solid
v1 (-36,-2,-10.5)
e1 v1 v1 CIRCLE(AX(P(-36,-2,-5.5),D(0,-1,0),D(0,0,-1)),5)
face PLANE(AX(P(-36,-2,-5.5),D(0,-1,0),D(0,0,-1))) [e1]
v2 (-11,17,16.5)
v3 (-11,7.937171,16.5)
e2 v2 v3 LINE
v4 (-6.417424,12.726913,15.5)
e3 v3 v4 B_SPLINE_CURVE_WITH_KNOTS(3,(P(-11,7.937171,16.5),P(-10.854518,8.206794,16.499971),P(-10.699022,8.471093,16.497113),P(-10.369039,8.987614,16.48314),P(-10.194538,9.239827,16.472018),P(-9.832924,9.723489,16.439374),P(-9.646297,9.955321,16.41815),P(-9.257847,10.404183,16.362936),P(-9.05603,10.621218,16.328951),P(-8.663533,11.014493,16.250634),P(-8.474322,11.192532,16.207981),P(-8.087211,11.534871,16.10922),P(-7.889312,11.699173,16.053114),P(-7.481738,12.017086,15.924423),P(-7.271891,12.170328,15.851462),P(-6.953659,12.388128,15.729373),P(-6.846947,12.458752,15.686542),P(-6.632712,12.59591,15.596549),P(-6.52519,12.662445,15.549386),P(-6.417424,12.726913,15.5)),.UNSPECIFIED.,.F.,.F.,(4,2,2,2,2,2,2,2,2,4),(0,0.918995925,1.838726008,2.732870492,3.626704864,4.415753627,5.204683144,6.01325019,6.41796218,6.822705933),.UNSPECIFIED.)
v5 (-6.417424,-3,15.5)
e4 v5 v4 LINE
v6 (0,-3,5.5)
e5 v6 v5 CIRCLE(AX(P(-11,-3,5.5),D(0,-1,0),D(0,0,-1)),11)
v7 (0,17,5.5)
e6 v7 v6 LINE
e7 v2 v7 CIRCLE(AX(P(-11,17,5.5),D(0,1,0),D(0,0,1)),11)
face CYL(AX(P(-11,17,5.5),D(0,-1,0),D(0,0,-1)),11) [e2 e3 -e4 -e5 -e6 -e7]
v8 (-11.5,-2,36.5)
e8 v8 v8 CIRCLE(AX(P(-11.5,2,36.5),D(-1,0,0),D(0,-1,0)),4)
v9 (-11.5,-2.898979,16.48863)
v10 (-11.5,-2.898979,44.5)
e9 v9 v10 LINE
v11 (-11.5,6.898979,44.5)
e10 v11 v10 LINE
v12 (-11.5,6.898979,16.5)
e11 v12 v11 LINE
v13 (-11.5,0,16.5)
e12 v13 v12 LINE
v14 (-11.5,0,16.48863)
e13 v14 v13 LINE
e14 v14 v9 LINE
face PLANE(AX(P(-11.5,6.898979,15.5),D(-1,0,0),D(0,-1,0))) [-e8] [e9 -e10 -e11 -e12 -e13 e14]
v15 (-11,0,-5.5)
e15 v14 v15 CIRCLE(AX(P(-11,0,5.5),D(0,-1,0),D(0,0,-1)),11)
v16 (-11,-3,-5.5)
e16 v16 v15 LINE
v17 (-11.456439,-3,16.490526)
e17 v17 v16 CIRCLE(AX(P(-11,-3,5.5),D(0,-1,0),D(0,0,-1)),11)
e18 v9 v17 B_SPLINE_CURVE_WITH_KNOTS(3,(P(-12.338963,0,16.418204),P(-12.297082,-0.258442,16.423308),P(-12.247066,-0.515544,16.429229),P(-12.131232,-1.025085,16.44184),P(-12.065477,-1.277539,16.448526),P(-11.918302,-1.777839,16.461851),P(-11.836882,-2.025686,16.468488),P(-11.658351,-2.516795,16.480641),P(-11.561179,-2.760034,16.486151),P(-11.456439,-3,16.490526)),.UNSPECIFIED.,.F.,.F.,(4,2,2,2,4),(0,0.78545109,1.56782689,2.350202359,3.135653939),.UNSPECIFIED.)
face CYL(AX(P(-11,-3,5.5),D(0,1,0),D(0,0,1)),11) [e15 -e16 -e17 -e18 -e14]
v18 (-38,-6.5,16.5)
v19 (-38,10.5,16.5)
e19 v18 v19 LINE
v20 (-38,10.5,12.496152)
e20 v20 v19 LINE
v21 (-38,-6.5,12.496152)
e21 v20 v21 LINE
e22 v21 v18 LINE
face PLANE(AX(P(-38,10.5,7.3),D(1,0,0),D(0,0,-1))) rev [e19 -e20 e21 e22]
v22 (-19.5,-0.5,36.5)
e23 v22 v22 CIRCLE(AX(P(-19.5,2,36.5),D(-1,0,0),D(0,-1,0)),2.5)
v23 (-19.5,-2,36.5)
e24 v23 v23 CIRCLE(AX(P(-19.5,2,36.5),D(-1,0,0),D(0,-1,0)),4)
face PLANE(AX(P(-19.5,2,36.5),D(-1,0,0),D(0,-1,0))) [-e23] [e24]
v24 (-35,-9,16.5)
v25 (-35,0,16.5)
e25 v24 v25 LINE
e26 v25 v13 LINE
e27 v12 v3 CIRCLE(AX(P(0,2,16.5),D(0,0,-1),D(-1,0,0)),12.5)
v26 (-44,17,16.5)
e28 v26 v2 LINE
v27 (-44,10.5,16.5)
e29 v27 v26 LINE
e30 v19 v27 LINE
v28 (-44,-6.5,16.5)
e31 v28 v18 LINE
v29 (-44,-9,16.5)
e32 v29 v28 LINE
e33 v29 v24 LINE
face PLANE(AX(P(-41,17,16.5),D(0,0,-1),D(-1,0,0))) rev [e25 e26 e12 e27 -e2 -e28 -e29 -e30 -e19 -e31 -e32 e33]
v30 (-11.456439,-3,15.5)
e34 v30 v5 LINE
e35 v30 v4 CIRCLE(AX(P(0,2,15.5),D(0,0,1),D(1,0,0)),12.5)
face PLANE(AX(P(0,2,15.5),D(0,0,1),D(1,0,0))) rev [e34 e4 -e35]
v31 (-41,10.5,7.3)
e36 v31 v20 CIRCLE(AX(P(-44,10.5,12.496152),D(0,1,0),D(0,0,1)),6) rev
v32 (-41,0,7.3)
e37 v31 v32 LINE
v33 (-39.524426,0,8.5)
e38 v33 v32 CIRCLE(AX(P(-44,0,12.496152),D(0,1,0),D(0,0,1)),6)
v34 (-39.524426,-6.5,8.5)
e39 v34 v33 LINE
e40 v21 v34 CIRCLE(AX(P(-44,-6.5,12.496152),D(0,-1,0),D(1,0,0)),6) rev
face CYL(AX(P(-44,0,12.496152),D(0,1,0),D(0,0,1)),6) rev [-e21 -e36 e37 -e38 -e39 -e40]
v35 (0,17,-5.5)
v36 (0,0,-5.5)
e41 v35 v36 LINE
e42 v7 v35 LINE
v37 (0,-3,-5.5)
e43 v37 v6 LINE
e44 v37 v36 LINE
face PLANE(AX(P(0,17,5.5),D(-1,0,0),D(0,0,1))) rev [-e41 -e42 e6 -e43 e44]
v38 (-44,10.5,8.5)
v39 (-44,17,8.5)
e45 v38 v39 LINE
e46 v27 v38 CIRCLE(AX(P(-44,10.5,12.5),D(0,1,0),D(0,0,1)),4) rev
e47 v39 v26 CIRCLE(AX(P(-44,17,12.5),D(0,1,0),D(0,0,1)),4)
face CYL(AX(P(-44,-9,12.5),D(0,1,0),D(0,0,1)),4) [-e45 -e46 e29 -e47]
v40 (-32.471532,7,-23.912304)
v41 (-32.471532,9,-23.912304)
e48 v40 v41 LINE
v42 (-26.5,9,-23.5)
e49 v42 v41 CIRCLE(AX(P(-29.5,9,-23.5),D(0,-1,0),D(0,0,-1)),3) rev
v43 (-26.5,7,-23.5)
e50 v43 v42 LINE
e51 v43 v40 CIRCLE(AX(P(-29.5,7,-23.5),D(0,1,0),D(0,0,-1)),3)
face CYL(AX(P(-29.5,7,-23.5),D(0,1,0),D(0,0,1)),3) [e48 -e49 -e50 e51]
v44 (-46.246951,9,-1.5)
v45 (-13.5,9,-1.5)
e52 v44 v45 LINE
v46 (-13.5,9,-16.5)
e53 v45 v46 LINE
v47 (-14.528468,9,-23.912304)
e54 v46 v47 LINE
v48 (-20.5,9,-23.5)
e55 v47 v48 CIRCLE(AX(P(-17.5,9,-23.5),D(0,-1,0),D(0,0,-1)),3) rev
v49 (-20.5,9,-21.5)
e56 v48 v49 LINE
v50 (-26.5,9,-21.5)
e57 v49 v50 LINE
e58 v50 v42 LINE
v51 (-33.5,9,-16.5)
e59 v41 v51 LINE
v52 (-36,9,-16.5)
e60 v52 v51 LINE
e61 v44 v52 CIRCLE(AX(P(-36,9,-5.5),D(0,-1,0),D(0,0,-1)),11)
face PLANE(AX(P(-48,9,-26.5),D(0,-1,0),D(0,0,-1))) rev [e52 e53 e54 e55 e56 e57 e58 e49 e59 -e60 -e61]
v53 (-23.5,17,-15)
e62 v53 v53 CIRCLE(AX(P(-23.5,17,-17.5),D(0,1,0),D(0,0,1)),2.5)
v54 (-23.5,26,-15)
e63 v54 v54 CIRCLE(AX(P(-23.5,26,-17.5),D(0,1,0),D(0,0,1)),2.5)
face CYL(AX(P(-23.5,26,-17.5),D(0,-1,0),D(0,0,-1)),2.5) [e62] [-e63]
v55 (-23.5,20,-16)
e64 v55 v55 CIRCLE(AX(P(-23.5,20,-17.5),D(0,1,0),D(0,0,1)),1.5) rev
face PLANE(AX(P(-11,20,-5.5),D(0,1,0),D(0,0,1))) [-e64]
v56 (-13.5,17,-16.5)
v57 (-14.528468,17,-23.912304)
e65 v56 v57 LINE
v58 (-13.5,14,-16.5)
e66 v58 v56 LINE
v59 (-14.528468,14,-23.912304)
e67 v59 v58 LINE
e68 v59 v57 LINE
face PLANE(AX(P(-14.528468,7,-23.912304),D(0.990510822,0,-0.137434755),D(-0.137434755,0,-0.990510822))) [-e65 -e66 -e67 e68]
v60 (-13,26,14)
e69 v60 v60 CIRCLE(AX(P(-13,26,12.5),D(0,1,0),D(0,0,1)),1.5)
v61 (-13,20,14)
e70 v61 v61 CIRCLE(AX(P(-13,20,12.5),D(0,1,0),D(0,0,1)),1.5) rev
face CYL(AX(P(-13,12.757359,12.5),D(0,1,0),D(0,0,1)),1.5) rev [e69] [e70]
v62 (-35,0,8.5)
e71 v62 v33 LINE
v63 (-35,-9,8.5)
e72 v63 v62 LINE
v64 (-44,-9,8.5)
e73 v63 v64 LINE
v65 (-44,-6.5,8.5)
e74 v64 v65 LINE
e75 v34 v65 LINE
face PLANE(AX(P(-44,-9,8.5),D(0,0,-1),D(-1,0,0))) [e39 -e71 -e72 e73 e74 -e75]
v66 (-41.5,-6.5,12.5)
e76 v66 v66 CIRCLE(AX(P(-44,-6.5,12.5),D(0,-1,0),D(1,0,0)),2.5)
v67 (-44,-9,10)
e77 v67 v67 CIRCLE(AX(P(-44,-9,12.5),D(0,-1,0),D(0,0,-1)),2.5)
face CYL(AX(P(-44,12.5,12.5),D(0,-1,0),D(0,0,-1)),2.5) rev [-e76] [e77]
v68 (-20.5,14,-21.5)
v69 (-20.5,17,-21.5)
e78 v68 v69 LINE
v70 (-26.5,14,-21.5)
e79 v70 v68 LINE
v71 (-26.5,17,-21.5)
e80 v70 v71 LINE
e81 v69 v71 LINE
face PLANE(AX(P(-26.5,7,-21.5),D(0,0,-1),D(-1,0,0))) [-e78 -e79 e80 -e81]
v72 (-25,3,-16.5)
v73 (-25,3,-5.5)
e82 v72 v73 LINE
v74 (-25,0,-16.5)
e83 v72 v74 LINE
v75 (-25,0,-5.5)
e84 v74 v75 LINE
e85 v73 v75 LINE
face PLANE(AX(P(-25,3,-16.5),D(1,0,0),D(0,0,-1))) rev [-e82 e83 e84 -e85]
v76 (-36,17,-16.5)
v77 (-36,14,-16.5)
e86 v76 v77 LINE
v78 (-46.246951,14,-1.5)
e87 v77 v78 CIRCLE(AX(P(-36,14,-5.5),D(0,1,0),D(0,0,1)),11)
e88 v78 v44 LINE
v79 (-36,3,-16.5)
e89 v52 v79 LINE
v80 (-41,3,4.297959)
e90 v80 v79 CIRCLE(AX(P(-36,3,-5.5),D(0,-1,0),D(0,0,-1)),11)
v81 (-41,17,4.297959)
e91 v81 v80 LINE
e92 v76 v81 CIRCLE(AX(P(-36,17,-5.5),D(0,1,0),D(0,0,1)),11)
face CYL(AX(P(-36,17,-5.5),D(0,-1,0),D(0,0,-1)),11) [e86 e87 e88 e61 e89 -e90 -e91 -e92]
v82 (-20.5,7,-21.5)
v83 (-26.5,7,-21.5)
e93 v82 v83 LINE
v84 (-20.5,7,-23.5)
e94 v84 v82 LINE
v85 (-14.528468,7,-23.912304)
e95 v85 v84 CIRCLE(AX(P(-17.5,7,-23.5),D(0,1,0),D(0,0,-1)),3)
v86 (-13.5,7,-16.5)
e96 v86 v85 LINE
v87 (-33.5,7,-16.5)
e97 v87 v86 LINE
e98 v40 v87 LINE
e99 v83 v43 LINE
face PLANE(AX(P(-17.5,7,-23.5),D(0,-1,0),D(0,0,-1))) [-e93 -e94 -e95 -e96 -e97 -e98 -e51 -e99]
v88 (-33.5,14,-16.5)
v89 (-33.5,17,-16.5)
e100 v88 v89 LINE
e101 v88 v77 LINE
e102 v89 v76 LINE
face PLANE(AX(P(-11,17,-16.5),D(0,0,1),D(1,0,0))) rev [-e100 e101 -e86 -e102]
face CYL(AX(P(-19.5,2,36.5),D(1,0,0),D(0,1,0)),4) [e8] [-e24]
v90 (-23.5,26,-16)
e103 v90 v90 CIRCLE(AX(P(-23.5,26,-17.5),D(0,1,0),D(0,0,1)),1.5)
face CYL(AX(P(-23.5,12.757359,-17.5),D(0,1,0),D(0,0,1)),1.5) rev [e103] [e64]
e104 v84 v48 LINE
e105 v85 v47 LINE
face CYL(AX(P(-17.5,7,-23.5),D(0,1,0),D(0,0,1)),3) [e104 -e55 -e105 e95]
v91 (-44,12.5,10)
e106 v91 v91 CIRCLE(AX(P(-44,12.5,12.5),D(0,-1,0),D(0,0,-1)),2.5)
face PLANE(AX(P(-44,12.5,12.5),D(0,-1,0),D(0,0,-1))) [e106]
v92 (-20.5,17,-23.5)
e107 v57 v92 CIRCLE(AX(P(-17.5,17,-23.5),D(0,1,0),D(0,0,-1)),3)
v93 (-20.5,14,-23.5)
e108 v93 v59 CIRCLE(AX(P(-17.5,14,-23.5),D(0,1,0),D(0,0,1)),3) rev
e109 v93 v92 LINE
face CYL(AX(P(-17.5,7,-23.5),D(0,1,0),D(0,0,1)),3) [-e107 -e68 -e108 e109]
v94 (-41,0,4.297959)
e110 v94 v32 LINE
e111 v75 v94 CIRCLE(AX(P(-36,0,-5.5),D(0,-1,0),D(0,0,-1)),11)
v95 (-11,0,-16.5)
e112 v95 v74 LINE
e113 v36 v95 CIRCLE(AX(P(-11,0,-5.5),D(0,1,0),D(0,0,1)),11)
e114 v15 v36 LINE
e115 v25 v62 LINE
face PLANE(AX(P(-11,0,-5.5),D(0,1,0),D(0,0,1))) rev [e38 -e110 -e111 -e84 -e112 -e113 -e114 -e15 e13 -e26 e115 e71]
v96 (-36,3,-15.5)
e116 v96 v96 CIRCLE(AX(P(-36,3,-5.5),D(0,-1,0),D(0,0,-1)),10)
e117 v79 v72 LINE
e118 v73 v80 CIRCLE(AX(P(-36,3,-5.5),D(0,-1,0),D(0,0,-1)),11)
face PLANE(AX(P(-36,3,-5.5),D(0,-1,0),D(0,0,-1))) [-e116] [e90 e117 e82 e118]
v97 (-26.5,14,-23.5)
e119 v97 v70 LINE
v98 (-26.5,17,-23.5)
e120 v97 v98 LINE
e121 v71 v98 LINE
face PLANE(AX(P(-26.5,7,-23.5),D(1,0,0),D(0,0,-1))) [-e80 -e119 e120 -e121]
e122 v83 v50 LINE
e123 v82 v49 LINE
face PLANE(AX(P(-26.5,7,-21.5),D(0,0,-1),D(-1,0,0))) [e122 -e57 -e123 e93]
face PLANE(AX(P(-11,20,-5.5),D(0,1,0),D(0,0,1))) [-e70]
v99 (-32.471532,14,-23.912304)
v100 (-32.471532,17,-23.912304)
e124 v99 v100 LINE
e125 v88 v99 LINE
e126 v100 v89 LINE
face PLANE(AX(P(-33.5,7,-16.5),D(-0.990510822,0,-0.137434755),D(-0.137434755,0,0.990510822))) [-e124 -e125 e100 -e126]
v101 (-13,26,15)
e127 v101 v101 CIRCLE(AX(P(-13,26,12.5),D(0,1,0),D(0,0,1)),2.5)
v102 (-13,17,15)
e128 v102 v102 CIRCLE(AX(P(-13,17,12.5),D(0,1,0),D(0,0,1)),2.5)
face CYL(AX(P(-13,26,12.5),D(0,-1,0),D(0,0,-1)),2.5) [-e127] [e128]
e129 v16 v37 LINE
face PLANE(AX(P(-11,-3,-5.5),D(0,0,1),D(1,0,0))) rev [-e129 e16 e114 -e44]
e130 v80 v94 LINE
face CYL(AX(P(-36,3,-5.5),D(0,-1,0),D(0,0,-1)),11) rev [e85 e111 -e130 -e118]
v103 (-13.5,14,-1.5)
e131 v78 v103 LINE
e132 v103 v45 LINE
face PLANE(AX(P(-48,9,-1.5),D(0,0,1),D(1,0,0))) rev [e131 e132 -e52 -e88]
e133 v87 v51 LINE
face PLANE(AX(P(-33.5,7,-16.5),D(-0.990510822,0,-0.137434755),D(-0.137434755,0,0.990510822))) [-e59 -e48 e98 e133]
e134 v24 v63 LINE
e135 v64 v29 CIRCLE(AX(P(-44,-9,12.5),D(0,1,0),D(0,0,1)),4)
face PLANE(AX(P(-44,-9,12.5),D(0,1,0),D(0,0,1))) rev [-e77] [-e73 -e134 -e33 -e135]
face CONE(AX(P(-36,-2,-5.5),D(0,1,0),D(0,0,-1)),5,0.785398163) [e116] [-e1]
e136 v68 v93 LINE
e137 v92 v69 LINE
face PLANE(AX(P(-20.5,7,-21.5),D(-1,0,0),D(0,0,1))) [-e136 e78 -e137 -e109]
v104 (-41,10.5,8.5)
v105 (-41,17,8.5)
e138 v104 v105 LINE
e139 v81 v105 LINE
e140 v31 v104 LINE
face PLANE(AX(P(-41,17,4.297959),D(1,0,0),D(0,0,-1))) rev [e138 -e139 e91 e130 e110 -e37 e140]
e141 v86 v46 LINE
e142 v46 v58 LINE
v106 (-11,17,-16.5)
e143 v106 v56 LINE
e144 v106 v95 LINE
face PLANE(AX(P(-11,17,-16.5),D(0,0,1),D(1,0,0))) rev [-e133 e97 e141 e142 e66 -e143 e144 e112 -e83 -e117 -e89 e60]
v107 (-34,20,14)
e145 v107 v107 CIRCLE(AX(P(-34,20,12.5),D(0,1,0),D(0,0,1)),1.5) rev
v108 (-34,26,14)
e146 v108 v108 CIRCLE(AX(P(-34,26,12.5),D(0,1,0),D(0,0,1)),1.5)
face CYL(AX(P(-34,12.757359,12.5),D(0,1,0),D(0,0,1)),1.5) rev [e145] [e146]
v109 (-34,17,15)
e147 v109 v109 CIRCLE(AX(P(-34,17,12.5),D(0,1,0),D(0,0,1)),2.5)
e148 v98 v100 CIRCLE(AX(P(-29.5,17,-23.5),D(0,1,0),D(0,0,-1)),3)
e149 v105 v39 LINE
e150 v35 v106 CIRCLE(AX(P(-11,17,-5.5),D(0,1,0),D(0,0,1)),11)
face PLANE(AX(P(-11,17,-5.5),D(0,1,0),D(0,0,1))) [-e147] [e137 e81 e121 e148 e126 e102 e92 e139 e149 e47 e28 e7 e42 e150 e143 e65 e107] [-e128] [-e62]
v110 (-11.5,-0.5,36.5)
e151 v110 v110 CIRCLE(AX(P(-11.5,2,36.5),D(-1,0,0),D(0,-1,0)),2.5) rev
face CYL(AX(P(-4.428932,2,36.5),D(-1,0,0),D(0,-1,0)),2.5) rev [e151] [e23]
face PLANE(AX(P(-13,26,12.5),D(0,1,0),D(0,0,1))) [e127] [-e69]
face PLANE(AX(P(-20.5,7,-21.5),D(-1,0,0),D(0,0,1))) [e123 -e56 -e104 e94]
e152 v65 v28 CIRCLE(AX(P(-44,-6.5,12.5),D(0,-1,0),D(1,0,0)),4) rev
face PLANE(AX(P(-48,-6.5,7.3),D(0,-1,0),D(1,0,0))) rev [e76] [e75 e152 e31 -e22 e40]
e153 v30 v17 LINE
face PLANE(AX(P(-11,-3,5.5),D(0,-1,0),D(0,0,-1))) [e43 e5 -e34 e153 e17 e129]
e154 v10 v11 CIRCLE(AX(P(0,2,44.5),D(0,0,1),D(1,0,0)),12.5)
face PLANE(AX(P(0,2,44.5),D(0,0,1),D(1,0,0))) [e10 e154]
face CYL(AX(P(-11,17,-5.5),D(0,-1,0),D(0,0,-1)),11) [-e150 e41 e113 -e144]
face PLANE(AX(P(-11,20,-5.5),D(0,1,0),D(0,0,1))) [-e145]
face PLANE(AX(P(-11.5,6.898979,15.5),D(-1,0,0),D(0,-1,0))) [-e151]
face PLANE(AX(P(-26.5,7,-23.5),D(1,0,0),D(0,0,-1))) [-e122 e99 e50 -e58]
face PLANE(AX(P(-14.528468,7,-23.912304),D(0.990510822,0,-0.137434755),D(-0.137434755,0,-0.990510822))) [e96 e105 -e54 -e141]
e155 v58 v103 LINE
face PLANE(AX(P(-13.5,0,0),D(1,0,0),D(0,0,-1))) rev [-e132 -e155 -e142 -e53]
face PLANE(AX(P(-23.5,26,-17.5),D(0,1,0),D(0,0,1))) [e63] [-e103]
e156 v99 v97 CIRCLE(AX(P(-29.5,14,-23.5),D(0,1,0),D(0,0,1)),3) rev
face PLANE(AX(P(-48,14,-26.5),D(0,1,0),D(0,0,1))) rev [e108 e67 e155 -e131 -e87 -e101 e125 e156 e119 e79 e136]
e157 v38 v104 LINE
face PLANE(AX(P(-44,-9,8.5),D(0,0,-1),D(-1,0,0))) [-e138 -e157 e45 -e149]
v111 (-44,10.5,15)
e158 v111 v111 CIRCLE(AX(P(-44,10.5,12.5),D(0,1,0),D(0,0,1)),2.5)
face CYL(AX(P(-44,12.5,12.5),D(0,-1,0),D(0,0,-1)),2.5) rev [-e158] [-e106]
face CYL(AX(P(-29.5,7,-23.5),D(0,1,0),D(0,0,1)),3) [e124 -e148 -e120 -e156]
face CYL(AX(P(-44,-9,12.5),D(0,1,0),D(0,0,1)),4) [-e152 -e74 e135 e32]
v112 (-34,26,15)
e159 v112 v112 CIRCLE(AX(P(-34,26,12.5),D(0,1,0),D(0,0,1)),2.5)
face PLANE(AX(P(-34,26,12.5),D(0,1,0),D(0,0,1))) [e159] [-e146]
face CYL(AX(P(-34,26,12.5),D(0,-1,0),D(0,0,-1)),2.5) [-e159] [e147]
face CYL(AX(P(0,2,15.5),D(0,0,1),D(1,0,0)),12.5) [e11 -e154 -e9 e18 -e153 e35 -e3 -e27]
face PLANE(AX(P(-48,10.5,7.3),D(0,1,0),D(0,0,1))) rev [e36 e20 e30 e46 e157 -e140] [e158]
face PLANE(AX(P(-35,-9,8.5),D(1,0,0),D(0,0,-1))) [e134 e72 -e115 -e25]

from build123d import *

# Parameters (mm, degrees)
BOSS_EXTRUDE1_DEPTH = 17
BOSS_EXTRUDE2_DEPTH = 10
BOSS_EXTRUDE3_DEPTH = 29
SKETCH6_R           = 4
BOSS_EXTRUDE4_DEPTH = 8
BOSS_EXTRUDE5_DEPTH = 26
SKETCH11_R          = 2.5
BOSS_EXTRUDE6_DEPTH = 9
BOSS_EXTRUDE8_START = 3
BOSS_EXTRUDE8_DEPTH = 3
CUT_EXTRUDE1_DEPTH  = 3
BOSS_EXTRUDE7_START = 2
SKETCH12_R          = 5
BOSS_EXTRUDE7_DEPTH = 5
BOSS_EXTRUDE7_TAPER = -45
SKETCH10_W          = 10
SKETCH10_H          = 17
CUT_EXTRUDE2_DEPTH  = 9.2
CUT_EXTRUDE3_START  = -13.5
SKETCH14_W          = 25
SKETCH14_H          = 5
CUT_EXTRUDE3_DEPTH  = 57.929042368
SKETCH15_R          = 2.5
CUT_EXTRUDE4_DEPTH  = 8
SKETCH16_R          = 1.5
CUT_EXTRUDE5_DEPTH  = 6
SKETCH17_R          = 2.5
CUT_EXTRUDE6_DEPTH  = 21.5
FILLET1_R           = 6


with BuildPart() as part:
    # Sketch1 → Boss-Extrude1 (new body)
    with BuildSketch(Plane(origin=(0, 0, 0), x_dir=(1, 0, 0), z_dir=(0, 1, 0))):
        with BuildLine():
            Line((-11, 16.5), (-36, 16.5))
            ThreePointArc((-36, 16.5), (-46.695268783, 8.071230378), (-41, -4.297958971))
            Line((-41, -4.297958971), (-41, -16.5))
            Line((-41, -16.5), (-11, -16.5))
            ThreePointArc((-11, -16.5), (-3.221825407, -13.278174593), (0, -5.5))
            Line((0, -5.5), (0, 5.5))
            ThreePointArc((0, 5.5), (-3.221825407, 13.278174593), (-11, 16.5))
        make_face()
    extrude(amount=BOSS_EXTRUDE1_DEPTH)

    # Sketch2 → Boss-Extrude2 (add)
    with BuildSketch(Plane(origin=(0, 17, 0), x_dir=(1, 0, 0), z_dir=(0, 1, 0))):
        with BuildLine():
            Line((-33.5, 16.5), (-32.471532465, 23.912304266))
            ThreePointArc((-32.471532465, 23.912304266), (-29.293357066, 26.492874655), (-26.5, 23.5))
            Line((-26.5, 23.5), (-26.5, 21.5))
            Line((-26.5, 21.5), (-20.5, 21.5))
            Line((-20.5, 21.5), (-20.5, 23.5))
            ThreePointArc((-20.5, 23.5), (-17.706642934, 26.492874655), (-14.528467535, 23.912304266))
            Line((-14.528467535, 23.912304266), (-13.5, 16.5))
            Line((-13.5, 16.5), (-33.5, 16.5))
        make_face()
    extrude(amount=-BOSS_EXTRUDE2_DEPTH)

    # Sketch5 → Boss-Extrude3 (add)
    with BuildSketch(Plane.XY.offset(44.5)):
        with BuildLine():
            Line((-11.5, 6.898979486), (-11.5, -2.898979486))
            ThreePointArc((-11.5, -2.898979486), (12.5, 2), (-11.5, 6.898979486))
        make_face()
    extrude(amount=-BOSS_EXTRUDE3_DEPTH)

    # Sketch6 → Boss-Extrude4 (add)
    with BuildSketch(Plane.ZY.offset(11.5)):
        with Locations(Location((36.5, 2, 0), (0, 0, 270))):
            Circle(SKETCH6_R)
    extrude(amount=BOSS_EXTRUDE4_DEPTH)

    # Sketch7 → Boss-Extrude5 (add)
    with BuildSketch(Plane(origin=(0, 17, 0), x_dir=(1, 0, 0), z_dir=(0, 1, 0))):
        with BuildLine():
            Line((-44, -8.5), (-35, -8.5))
            Line((-35, -8.5), (-35, -16.5))
            Line((-35, -16.5), (-44, -16.5))
            ThreePointArc((-44, -16.5), (-48, -12.5), (-44, -8.5))
        make_face()
    extrude(amount=-BOSS_EXTRUDE5_DEPTH)

    # Sketch11 → Boss-Extrude6 (add)
    with BuildSketch(Plane(origin=(0, 17, 0), x_dir=(1, 0, 0), z_dir=(0, 1, 0))):
        with Locations(Location((-23.5, 17.5, 0), (0, 0, 270))):
            Circle(SKETCH11_R)
        with Locations(Location((-34, -12.5, 0), (0, 0, 270))):
            Circle(SKETCH11_R)
        with Locations(Location((-13, -12.5, 0), (0, 0, 270))):
            Circle(SKETCH11_R)
    extrude(amount=BOSS_EXTRUDE6_DEPTH)

    # Sketch13 → Boss-Extrude8 (add)
    with BuildSketch(Plane.XZ.offset(BOSS_EXTRUDE8_START)):
        with BuildLine():
            Line((-11, -5.5), (0, -5.5))
            Line((0, -5.5), (0, 5.5))
            ThreePointArc((0, 5.5), (-18.778174593, 13.278174593), (-11, -5.5))
        make_face()
    extrude(amount=-BOSS_EXTRUDE8_DEPTH)

    # Sketch9 → Cut-Extrude1 (cut)
    with BuildSketch(Plane.XZ):
        with BuildLine():
            Line((-25, -16.5), (-25, -5.5))
            ThreePointArc((-25, -5.5), (-43.778174593, 2.278174593), (-36, -16.5))
            Line((-36, -16.5), (-25, -16.5))
        make_face()
    extrude(amount=-CUT_EXTRUDE1_DEPTH, mode=Mode.SUBTRACT)

    # Sketch12 → Boss-Extrude7 (add)
    with BuildSketch(Plane.XZ.offset(BOSS_EXTRUDE7_START)):
        with Locations((-36, -5.5)):
            Circle(SKETCH12_R)
    extrude(amount=-BOSS_EXTRUDE7_DEPTH, taper=BOSS_EXTRUDE7_TAPER)

    # Sketch10 → Cut-Extrude2 (cut)
    with BuildSketch(Plane.XY.offset(16.5)):
        with Locations((-43, 2)):
            Rectangle(SKETCH10_W, SKETCH10_H)
    extrude(amount=-CUT_EXTRUDE2_DEPTH, mode=Mode.SUBTRACT)

    # Sketch14 → Cut-Extrude3 (cut, through all)
    with BuildSketch(Plane(origin=(0, 0, 0), x_dir=(0, 0, -1), z_dir=(1, 0, 0)).offset(CUT_EXTRUDE3_START)):
        with Locations((14, 11.5)):
            Rectangle(SKETCH14_W, SKETCH14_H)
    extrude(amount=-CUT_EXTRUDE3_DEPTH, mode=Mode.SUBTRACT)

    # Sketch15 → Cut-Extrude4 (cut)
    with BuildSketch(Plane.ZY.offset(19.5)):
        with Locations(Location((36.5, 2, 0), (0, 0, 270))):
            Circle(SKETCH15_R)
    extrude(amount=-CUT_EXTRUDE4_DEPTH, mode=Mode.SUBTRACT)

    # Sketch16 → Cut-Extrude5 (cut)
    with BuildSketch(Plane(origin=(0, 26, 0), x_dir=(1, 0, 0), z_dir=(0, 1, 0))):
        with Locations(Location((-23.5, 17.5, 0), (0, 0, 270))):
            Circle(SKETCH16_R)
        with Locations(Location((-34, -12.5, 0), (0, 0, 270))):
            Circle(SKETCH16_R)
        with Locations(Location((-13, -12.5, 0), (0, 0, 270))):
            Circle(SKETCH16_R)
    extrude(amount=-CUT_EXTRUDE5_DEPTH, mode=Mode.SUBTRACT)

    # Sketch17 → Cut-Extrude6 (cut)
    with BuildSketch(Plane.XZ.offset(9)):
        with Locations(Location((-44, 12.5, 0), (0, 0, 270))):
            Circle(SKETCH17_R)
    extrude(amount=-CUT_EXTRUDE6_DEPTH, mode=Mode.SUBTRACT)

    # Fillet1
    # the kernel refuses this fillet: 6 mm, written as the material it adds along each edge
    with BuildSketch(Plane(origin=(-38, 10.5, 7.3), x_dir=(0, 0, 1), z_dir=(0, -1, 0))) as fillet1_piece_1_section:
        with BuildLine():
            CenterArc((5.196152423, 6), FILLET1_R, 210, 60)
            Line((0, 3), (0, 0))
            Line((0, 0), (5.196152423, 0))
        make_face()
    fillet1_piece_1 = extrude(amount=23.490381057, mode=Mode.PRIVATE)
    fillet1_piece_1 = split(fillet1_piece_1, bisect_by=Plane(origin=(-38.38283384, 5.25, 8.5), z_dir=(0, 0, 1)), keep=Keep.TOP, mode=Mode.PRIVATE)
    fillet1_piece_1 = split(fillet1_piece_1, bisect_by=Plane(origin=(-38.38283384, -9, 10.353353241), z_dir=(0, 1, 0)), keep=Keep.TOP, mode=Mode.PRIVATE)
    add(fillet1_piece_1)
    with BuildSketch(Plane(origin=(-38, 10.5, 7.3), x_dir=(0, 0, 1), z_dir=(0, -1, 0))) as fillet1_piece_2:
        with BuildLine():
            CenterArc((5.196152423, 6), FILLET1_R, 210, 60)
            Line((0, 3), (0, 0))
            Line((0, 0), (5.196152423, 0))
        make_face()
    extrude(amount=10.5)


solid = part.part
